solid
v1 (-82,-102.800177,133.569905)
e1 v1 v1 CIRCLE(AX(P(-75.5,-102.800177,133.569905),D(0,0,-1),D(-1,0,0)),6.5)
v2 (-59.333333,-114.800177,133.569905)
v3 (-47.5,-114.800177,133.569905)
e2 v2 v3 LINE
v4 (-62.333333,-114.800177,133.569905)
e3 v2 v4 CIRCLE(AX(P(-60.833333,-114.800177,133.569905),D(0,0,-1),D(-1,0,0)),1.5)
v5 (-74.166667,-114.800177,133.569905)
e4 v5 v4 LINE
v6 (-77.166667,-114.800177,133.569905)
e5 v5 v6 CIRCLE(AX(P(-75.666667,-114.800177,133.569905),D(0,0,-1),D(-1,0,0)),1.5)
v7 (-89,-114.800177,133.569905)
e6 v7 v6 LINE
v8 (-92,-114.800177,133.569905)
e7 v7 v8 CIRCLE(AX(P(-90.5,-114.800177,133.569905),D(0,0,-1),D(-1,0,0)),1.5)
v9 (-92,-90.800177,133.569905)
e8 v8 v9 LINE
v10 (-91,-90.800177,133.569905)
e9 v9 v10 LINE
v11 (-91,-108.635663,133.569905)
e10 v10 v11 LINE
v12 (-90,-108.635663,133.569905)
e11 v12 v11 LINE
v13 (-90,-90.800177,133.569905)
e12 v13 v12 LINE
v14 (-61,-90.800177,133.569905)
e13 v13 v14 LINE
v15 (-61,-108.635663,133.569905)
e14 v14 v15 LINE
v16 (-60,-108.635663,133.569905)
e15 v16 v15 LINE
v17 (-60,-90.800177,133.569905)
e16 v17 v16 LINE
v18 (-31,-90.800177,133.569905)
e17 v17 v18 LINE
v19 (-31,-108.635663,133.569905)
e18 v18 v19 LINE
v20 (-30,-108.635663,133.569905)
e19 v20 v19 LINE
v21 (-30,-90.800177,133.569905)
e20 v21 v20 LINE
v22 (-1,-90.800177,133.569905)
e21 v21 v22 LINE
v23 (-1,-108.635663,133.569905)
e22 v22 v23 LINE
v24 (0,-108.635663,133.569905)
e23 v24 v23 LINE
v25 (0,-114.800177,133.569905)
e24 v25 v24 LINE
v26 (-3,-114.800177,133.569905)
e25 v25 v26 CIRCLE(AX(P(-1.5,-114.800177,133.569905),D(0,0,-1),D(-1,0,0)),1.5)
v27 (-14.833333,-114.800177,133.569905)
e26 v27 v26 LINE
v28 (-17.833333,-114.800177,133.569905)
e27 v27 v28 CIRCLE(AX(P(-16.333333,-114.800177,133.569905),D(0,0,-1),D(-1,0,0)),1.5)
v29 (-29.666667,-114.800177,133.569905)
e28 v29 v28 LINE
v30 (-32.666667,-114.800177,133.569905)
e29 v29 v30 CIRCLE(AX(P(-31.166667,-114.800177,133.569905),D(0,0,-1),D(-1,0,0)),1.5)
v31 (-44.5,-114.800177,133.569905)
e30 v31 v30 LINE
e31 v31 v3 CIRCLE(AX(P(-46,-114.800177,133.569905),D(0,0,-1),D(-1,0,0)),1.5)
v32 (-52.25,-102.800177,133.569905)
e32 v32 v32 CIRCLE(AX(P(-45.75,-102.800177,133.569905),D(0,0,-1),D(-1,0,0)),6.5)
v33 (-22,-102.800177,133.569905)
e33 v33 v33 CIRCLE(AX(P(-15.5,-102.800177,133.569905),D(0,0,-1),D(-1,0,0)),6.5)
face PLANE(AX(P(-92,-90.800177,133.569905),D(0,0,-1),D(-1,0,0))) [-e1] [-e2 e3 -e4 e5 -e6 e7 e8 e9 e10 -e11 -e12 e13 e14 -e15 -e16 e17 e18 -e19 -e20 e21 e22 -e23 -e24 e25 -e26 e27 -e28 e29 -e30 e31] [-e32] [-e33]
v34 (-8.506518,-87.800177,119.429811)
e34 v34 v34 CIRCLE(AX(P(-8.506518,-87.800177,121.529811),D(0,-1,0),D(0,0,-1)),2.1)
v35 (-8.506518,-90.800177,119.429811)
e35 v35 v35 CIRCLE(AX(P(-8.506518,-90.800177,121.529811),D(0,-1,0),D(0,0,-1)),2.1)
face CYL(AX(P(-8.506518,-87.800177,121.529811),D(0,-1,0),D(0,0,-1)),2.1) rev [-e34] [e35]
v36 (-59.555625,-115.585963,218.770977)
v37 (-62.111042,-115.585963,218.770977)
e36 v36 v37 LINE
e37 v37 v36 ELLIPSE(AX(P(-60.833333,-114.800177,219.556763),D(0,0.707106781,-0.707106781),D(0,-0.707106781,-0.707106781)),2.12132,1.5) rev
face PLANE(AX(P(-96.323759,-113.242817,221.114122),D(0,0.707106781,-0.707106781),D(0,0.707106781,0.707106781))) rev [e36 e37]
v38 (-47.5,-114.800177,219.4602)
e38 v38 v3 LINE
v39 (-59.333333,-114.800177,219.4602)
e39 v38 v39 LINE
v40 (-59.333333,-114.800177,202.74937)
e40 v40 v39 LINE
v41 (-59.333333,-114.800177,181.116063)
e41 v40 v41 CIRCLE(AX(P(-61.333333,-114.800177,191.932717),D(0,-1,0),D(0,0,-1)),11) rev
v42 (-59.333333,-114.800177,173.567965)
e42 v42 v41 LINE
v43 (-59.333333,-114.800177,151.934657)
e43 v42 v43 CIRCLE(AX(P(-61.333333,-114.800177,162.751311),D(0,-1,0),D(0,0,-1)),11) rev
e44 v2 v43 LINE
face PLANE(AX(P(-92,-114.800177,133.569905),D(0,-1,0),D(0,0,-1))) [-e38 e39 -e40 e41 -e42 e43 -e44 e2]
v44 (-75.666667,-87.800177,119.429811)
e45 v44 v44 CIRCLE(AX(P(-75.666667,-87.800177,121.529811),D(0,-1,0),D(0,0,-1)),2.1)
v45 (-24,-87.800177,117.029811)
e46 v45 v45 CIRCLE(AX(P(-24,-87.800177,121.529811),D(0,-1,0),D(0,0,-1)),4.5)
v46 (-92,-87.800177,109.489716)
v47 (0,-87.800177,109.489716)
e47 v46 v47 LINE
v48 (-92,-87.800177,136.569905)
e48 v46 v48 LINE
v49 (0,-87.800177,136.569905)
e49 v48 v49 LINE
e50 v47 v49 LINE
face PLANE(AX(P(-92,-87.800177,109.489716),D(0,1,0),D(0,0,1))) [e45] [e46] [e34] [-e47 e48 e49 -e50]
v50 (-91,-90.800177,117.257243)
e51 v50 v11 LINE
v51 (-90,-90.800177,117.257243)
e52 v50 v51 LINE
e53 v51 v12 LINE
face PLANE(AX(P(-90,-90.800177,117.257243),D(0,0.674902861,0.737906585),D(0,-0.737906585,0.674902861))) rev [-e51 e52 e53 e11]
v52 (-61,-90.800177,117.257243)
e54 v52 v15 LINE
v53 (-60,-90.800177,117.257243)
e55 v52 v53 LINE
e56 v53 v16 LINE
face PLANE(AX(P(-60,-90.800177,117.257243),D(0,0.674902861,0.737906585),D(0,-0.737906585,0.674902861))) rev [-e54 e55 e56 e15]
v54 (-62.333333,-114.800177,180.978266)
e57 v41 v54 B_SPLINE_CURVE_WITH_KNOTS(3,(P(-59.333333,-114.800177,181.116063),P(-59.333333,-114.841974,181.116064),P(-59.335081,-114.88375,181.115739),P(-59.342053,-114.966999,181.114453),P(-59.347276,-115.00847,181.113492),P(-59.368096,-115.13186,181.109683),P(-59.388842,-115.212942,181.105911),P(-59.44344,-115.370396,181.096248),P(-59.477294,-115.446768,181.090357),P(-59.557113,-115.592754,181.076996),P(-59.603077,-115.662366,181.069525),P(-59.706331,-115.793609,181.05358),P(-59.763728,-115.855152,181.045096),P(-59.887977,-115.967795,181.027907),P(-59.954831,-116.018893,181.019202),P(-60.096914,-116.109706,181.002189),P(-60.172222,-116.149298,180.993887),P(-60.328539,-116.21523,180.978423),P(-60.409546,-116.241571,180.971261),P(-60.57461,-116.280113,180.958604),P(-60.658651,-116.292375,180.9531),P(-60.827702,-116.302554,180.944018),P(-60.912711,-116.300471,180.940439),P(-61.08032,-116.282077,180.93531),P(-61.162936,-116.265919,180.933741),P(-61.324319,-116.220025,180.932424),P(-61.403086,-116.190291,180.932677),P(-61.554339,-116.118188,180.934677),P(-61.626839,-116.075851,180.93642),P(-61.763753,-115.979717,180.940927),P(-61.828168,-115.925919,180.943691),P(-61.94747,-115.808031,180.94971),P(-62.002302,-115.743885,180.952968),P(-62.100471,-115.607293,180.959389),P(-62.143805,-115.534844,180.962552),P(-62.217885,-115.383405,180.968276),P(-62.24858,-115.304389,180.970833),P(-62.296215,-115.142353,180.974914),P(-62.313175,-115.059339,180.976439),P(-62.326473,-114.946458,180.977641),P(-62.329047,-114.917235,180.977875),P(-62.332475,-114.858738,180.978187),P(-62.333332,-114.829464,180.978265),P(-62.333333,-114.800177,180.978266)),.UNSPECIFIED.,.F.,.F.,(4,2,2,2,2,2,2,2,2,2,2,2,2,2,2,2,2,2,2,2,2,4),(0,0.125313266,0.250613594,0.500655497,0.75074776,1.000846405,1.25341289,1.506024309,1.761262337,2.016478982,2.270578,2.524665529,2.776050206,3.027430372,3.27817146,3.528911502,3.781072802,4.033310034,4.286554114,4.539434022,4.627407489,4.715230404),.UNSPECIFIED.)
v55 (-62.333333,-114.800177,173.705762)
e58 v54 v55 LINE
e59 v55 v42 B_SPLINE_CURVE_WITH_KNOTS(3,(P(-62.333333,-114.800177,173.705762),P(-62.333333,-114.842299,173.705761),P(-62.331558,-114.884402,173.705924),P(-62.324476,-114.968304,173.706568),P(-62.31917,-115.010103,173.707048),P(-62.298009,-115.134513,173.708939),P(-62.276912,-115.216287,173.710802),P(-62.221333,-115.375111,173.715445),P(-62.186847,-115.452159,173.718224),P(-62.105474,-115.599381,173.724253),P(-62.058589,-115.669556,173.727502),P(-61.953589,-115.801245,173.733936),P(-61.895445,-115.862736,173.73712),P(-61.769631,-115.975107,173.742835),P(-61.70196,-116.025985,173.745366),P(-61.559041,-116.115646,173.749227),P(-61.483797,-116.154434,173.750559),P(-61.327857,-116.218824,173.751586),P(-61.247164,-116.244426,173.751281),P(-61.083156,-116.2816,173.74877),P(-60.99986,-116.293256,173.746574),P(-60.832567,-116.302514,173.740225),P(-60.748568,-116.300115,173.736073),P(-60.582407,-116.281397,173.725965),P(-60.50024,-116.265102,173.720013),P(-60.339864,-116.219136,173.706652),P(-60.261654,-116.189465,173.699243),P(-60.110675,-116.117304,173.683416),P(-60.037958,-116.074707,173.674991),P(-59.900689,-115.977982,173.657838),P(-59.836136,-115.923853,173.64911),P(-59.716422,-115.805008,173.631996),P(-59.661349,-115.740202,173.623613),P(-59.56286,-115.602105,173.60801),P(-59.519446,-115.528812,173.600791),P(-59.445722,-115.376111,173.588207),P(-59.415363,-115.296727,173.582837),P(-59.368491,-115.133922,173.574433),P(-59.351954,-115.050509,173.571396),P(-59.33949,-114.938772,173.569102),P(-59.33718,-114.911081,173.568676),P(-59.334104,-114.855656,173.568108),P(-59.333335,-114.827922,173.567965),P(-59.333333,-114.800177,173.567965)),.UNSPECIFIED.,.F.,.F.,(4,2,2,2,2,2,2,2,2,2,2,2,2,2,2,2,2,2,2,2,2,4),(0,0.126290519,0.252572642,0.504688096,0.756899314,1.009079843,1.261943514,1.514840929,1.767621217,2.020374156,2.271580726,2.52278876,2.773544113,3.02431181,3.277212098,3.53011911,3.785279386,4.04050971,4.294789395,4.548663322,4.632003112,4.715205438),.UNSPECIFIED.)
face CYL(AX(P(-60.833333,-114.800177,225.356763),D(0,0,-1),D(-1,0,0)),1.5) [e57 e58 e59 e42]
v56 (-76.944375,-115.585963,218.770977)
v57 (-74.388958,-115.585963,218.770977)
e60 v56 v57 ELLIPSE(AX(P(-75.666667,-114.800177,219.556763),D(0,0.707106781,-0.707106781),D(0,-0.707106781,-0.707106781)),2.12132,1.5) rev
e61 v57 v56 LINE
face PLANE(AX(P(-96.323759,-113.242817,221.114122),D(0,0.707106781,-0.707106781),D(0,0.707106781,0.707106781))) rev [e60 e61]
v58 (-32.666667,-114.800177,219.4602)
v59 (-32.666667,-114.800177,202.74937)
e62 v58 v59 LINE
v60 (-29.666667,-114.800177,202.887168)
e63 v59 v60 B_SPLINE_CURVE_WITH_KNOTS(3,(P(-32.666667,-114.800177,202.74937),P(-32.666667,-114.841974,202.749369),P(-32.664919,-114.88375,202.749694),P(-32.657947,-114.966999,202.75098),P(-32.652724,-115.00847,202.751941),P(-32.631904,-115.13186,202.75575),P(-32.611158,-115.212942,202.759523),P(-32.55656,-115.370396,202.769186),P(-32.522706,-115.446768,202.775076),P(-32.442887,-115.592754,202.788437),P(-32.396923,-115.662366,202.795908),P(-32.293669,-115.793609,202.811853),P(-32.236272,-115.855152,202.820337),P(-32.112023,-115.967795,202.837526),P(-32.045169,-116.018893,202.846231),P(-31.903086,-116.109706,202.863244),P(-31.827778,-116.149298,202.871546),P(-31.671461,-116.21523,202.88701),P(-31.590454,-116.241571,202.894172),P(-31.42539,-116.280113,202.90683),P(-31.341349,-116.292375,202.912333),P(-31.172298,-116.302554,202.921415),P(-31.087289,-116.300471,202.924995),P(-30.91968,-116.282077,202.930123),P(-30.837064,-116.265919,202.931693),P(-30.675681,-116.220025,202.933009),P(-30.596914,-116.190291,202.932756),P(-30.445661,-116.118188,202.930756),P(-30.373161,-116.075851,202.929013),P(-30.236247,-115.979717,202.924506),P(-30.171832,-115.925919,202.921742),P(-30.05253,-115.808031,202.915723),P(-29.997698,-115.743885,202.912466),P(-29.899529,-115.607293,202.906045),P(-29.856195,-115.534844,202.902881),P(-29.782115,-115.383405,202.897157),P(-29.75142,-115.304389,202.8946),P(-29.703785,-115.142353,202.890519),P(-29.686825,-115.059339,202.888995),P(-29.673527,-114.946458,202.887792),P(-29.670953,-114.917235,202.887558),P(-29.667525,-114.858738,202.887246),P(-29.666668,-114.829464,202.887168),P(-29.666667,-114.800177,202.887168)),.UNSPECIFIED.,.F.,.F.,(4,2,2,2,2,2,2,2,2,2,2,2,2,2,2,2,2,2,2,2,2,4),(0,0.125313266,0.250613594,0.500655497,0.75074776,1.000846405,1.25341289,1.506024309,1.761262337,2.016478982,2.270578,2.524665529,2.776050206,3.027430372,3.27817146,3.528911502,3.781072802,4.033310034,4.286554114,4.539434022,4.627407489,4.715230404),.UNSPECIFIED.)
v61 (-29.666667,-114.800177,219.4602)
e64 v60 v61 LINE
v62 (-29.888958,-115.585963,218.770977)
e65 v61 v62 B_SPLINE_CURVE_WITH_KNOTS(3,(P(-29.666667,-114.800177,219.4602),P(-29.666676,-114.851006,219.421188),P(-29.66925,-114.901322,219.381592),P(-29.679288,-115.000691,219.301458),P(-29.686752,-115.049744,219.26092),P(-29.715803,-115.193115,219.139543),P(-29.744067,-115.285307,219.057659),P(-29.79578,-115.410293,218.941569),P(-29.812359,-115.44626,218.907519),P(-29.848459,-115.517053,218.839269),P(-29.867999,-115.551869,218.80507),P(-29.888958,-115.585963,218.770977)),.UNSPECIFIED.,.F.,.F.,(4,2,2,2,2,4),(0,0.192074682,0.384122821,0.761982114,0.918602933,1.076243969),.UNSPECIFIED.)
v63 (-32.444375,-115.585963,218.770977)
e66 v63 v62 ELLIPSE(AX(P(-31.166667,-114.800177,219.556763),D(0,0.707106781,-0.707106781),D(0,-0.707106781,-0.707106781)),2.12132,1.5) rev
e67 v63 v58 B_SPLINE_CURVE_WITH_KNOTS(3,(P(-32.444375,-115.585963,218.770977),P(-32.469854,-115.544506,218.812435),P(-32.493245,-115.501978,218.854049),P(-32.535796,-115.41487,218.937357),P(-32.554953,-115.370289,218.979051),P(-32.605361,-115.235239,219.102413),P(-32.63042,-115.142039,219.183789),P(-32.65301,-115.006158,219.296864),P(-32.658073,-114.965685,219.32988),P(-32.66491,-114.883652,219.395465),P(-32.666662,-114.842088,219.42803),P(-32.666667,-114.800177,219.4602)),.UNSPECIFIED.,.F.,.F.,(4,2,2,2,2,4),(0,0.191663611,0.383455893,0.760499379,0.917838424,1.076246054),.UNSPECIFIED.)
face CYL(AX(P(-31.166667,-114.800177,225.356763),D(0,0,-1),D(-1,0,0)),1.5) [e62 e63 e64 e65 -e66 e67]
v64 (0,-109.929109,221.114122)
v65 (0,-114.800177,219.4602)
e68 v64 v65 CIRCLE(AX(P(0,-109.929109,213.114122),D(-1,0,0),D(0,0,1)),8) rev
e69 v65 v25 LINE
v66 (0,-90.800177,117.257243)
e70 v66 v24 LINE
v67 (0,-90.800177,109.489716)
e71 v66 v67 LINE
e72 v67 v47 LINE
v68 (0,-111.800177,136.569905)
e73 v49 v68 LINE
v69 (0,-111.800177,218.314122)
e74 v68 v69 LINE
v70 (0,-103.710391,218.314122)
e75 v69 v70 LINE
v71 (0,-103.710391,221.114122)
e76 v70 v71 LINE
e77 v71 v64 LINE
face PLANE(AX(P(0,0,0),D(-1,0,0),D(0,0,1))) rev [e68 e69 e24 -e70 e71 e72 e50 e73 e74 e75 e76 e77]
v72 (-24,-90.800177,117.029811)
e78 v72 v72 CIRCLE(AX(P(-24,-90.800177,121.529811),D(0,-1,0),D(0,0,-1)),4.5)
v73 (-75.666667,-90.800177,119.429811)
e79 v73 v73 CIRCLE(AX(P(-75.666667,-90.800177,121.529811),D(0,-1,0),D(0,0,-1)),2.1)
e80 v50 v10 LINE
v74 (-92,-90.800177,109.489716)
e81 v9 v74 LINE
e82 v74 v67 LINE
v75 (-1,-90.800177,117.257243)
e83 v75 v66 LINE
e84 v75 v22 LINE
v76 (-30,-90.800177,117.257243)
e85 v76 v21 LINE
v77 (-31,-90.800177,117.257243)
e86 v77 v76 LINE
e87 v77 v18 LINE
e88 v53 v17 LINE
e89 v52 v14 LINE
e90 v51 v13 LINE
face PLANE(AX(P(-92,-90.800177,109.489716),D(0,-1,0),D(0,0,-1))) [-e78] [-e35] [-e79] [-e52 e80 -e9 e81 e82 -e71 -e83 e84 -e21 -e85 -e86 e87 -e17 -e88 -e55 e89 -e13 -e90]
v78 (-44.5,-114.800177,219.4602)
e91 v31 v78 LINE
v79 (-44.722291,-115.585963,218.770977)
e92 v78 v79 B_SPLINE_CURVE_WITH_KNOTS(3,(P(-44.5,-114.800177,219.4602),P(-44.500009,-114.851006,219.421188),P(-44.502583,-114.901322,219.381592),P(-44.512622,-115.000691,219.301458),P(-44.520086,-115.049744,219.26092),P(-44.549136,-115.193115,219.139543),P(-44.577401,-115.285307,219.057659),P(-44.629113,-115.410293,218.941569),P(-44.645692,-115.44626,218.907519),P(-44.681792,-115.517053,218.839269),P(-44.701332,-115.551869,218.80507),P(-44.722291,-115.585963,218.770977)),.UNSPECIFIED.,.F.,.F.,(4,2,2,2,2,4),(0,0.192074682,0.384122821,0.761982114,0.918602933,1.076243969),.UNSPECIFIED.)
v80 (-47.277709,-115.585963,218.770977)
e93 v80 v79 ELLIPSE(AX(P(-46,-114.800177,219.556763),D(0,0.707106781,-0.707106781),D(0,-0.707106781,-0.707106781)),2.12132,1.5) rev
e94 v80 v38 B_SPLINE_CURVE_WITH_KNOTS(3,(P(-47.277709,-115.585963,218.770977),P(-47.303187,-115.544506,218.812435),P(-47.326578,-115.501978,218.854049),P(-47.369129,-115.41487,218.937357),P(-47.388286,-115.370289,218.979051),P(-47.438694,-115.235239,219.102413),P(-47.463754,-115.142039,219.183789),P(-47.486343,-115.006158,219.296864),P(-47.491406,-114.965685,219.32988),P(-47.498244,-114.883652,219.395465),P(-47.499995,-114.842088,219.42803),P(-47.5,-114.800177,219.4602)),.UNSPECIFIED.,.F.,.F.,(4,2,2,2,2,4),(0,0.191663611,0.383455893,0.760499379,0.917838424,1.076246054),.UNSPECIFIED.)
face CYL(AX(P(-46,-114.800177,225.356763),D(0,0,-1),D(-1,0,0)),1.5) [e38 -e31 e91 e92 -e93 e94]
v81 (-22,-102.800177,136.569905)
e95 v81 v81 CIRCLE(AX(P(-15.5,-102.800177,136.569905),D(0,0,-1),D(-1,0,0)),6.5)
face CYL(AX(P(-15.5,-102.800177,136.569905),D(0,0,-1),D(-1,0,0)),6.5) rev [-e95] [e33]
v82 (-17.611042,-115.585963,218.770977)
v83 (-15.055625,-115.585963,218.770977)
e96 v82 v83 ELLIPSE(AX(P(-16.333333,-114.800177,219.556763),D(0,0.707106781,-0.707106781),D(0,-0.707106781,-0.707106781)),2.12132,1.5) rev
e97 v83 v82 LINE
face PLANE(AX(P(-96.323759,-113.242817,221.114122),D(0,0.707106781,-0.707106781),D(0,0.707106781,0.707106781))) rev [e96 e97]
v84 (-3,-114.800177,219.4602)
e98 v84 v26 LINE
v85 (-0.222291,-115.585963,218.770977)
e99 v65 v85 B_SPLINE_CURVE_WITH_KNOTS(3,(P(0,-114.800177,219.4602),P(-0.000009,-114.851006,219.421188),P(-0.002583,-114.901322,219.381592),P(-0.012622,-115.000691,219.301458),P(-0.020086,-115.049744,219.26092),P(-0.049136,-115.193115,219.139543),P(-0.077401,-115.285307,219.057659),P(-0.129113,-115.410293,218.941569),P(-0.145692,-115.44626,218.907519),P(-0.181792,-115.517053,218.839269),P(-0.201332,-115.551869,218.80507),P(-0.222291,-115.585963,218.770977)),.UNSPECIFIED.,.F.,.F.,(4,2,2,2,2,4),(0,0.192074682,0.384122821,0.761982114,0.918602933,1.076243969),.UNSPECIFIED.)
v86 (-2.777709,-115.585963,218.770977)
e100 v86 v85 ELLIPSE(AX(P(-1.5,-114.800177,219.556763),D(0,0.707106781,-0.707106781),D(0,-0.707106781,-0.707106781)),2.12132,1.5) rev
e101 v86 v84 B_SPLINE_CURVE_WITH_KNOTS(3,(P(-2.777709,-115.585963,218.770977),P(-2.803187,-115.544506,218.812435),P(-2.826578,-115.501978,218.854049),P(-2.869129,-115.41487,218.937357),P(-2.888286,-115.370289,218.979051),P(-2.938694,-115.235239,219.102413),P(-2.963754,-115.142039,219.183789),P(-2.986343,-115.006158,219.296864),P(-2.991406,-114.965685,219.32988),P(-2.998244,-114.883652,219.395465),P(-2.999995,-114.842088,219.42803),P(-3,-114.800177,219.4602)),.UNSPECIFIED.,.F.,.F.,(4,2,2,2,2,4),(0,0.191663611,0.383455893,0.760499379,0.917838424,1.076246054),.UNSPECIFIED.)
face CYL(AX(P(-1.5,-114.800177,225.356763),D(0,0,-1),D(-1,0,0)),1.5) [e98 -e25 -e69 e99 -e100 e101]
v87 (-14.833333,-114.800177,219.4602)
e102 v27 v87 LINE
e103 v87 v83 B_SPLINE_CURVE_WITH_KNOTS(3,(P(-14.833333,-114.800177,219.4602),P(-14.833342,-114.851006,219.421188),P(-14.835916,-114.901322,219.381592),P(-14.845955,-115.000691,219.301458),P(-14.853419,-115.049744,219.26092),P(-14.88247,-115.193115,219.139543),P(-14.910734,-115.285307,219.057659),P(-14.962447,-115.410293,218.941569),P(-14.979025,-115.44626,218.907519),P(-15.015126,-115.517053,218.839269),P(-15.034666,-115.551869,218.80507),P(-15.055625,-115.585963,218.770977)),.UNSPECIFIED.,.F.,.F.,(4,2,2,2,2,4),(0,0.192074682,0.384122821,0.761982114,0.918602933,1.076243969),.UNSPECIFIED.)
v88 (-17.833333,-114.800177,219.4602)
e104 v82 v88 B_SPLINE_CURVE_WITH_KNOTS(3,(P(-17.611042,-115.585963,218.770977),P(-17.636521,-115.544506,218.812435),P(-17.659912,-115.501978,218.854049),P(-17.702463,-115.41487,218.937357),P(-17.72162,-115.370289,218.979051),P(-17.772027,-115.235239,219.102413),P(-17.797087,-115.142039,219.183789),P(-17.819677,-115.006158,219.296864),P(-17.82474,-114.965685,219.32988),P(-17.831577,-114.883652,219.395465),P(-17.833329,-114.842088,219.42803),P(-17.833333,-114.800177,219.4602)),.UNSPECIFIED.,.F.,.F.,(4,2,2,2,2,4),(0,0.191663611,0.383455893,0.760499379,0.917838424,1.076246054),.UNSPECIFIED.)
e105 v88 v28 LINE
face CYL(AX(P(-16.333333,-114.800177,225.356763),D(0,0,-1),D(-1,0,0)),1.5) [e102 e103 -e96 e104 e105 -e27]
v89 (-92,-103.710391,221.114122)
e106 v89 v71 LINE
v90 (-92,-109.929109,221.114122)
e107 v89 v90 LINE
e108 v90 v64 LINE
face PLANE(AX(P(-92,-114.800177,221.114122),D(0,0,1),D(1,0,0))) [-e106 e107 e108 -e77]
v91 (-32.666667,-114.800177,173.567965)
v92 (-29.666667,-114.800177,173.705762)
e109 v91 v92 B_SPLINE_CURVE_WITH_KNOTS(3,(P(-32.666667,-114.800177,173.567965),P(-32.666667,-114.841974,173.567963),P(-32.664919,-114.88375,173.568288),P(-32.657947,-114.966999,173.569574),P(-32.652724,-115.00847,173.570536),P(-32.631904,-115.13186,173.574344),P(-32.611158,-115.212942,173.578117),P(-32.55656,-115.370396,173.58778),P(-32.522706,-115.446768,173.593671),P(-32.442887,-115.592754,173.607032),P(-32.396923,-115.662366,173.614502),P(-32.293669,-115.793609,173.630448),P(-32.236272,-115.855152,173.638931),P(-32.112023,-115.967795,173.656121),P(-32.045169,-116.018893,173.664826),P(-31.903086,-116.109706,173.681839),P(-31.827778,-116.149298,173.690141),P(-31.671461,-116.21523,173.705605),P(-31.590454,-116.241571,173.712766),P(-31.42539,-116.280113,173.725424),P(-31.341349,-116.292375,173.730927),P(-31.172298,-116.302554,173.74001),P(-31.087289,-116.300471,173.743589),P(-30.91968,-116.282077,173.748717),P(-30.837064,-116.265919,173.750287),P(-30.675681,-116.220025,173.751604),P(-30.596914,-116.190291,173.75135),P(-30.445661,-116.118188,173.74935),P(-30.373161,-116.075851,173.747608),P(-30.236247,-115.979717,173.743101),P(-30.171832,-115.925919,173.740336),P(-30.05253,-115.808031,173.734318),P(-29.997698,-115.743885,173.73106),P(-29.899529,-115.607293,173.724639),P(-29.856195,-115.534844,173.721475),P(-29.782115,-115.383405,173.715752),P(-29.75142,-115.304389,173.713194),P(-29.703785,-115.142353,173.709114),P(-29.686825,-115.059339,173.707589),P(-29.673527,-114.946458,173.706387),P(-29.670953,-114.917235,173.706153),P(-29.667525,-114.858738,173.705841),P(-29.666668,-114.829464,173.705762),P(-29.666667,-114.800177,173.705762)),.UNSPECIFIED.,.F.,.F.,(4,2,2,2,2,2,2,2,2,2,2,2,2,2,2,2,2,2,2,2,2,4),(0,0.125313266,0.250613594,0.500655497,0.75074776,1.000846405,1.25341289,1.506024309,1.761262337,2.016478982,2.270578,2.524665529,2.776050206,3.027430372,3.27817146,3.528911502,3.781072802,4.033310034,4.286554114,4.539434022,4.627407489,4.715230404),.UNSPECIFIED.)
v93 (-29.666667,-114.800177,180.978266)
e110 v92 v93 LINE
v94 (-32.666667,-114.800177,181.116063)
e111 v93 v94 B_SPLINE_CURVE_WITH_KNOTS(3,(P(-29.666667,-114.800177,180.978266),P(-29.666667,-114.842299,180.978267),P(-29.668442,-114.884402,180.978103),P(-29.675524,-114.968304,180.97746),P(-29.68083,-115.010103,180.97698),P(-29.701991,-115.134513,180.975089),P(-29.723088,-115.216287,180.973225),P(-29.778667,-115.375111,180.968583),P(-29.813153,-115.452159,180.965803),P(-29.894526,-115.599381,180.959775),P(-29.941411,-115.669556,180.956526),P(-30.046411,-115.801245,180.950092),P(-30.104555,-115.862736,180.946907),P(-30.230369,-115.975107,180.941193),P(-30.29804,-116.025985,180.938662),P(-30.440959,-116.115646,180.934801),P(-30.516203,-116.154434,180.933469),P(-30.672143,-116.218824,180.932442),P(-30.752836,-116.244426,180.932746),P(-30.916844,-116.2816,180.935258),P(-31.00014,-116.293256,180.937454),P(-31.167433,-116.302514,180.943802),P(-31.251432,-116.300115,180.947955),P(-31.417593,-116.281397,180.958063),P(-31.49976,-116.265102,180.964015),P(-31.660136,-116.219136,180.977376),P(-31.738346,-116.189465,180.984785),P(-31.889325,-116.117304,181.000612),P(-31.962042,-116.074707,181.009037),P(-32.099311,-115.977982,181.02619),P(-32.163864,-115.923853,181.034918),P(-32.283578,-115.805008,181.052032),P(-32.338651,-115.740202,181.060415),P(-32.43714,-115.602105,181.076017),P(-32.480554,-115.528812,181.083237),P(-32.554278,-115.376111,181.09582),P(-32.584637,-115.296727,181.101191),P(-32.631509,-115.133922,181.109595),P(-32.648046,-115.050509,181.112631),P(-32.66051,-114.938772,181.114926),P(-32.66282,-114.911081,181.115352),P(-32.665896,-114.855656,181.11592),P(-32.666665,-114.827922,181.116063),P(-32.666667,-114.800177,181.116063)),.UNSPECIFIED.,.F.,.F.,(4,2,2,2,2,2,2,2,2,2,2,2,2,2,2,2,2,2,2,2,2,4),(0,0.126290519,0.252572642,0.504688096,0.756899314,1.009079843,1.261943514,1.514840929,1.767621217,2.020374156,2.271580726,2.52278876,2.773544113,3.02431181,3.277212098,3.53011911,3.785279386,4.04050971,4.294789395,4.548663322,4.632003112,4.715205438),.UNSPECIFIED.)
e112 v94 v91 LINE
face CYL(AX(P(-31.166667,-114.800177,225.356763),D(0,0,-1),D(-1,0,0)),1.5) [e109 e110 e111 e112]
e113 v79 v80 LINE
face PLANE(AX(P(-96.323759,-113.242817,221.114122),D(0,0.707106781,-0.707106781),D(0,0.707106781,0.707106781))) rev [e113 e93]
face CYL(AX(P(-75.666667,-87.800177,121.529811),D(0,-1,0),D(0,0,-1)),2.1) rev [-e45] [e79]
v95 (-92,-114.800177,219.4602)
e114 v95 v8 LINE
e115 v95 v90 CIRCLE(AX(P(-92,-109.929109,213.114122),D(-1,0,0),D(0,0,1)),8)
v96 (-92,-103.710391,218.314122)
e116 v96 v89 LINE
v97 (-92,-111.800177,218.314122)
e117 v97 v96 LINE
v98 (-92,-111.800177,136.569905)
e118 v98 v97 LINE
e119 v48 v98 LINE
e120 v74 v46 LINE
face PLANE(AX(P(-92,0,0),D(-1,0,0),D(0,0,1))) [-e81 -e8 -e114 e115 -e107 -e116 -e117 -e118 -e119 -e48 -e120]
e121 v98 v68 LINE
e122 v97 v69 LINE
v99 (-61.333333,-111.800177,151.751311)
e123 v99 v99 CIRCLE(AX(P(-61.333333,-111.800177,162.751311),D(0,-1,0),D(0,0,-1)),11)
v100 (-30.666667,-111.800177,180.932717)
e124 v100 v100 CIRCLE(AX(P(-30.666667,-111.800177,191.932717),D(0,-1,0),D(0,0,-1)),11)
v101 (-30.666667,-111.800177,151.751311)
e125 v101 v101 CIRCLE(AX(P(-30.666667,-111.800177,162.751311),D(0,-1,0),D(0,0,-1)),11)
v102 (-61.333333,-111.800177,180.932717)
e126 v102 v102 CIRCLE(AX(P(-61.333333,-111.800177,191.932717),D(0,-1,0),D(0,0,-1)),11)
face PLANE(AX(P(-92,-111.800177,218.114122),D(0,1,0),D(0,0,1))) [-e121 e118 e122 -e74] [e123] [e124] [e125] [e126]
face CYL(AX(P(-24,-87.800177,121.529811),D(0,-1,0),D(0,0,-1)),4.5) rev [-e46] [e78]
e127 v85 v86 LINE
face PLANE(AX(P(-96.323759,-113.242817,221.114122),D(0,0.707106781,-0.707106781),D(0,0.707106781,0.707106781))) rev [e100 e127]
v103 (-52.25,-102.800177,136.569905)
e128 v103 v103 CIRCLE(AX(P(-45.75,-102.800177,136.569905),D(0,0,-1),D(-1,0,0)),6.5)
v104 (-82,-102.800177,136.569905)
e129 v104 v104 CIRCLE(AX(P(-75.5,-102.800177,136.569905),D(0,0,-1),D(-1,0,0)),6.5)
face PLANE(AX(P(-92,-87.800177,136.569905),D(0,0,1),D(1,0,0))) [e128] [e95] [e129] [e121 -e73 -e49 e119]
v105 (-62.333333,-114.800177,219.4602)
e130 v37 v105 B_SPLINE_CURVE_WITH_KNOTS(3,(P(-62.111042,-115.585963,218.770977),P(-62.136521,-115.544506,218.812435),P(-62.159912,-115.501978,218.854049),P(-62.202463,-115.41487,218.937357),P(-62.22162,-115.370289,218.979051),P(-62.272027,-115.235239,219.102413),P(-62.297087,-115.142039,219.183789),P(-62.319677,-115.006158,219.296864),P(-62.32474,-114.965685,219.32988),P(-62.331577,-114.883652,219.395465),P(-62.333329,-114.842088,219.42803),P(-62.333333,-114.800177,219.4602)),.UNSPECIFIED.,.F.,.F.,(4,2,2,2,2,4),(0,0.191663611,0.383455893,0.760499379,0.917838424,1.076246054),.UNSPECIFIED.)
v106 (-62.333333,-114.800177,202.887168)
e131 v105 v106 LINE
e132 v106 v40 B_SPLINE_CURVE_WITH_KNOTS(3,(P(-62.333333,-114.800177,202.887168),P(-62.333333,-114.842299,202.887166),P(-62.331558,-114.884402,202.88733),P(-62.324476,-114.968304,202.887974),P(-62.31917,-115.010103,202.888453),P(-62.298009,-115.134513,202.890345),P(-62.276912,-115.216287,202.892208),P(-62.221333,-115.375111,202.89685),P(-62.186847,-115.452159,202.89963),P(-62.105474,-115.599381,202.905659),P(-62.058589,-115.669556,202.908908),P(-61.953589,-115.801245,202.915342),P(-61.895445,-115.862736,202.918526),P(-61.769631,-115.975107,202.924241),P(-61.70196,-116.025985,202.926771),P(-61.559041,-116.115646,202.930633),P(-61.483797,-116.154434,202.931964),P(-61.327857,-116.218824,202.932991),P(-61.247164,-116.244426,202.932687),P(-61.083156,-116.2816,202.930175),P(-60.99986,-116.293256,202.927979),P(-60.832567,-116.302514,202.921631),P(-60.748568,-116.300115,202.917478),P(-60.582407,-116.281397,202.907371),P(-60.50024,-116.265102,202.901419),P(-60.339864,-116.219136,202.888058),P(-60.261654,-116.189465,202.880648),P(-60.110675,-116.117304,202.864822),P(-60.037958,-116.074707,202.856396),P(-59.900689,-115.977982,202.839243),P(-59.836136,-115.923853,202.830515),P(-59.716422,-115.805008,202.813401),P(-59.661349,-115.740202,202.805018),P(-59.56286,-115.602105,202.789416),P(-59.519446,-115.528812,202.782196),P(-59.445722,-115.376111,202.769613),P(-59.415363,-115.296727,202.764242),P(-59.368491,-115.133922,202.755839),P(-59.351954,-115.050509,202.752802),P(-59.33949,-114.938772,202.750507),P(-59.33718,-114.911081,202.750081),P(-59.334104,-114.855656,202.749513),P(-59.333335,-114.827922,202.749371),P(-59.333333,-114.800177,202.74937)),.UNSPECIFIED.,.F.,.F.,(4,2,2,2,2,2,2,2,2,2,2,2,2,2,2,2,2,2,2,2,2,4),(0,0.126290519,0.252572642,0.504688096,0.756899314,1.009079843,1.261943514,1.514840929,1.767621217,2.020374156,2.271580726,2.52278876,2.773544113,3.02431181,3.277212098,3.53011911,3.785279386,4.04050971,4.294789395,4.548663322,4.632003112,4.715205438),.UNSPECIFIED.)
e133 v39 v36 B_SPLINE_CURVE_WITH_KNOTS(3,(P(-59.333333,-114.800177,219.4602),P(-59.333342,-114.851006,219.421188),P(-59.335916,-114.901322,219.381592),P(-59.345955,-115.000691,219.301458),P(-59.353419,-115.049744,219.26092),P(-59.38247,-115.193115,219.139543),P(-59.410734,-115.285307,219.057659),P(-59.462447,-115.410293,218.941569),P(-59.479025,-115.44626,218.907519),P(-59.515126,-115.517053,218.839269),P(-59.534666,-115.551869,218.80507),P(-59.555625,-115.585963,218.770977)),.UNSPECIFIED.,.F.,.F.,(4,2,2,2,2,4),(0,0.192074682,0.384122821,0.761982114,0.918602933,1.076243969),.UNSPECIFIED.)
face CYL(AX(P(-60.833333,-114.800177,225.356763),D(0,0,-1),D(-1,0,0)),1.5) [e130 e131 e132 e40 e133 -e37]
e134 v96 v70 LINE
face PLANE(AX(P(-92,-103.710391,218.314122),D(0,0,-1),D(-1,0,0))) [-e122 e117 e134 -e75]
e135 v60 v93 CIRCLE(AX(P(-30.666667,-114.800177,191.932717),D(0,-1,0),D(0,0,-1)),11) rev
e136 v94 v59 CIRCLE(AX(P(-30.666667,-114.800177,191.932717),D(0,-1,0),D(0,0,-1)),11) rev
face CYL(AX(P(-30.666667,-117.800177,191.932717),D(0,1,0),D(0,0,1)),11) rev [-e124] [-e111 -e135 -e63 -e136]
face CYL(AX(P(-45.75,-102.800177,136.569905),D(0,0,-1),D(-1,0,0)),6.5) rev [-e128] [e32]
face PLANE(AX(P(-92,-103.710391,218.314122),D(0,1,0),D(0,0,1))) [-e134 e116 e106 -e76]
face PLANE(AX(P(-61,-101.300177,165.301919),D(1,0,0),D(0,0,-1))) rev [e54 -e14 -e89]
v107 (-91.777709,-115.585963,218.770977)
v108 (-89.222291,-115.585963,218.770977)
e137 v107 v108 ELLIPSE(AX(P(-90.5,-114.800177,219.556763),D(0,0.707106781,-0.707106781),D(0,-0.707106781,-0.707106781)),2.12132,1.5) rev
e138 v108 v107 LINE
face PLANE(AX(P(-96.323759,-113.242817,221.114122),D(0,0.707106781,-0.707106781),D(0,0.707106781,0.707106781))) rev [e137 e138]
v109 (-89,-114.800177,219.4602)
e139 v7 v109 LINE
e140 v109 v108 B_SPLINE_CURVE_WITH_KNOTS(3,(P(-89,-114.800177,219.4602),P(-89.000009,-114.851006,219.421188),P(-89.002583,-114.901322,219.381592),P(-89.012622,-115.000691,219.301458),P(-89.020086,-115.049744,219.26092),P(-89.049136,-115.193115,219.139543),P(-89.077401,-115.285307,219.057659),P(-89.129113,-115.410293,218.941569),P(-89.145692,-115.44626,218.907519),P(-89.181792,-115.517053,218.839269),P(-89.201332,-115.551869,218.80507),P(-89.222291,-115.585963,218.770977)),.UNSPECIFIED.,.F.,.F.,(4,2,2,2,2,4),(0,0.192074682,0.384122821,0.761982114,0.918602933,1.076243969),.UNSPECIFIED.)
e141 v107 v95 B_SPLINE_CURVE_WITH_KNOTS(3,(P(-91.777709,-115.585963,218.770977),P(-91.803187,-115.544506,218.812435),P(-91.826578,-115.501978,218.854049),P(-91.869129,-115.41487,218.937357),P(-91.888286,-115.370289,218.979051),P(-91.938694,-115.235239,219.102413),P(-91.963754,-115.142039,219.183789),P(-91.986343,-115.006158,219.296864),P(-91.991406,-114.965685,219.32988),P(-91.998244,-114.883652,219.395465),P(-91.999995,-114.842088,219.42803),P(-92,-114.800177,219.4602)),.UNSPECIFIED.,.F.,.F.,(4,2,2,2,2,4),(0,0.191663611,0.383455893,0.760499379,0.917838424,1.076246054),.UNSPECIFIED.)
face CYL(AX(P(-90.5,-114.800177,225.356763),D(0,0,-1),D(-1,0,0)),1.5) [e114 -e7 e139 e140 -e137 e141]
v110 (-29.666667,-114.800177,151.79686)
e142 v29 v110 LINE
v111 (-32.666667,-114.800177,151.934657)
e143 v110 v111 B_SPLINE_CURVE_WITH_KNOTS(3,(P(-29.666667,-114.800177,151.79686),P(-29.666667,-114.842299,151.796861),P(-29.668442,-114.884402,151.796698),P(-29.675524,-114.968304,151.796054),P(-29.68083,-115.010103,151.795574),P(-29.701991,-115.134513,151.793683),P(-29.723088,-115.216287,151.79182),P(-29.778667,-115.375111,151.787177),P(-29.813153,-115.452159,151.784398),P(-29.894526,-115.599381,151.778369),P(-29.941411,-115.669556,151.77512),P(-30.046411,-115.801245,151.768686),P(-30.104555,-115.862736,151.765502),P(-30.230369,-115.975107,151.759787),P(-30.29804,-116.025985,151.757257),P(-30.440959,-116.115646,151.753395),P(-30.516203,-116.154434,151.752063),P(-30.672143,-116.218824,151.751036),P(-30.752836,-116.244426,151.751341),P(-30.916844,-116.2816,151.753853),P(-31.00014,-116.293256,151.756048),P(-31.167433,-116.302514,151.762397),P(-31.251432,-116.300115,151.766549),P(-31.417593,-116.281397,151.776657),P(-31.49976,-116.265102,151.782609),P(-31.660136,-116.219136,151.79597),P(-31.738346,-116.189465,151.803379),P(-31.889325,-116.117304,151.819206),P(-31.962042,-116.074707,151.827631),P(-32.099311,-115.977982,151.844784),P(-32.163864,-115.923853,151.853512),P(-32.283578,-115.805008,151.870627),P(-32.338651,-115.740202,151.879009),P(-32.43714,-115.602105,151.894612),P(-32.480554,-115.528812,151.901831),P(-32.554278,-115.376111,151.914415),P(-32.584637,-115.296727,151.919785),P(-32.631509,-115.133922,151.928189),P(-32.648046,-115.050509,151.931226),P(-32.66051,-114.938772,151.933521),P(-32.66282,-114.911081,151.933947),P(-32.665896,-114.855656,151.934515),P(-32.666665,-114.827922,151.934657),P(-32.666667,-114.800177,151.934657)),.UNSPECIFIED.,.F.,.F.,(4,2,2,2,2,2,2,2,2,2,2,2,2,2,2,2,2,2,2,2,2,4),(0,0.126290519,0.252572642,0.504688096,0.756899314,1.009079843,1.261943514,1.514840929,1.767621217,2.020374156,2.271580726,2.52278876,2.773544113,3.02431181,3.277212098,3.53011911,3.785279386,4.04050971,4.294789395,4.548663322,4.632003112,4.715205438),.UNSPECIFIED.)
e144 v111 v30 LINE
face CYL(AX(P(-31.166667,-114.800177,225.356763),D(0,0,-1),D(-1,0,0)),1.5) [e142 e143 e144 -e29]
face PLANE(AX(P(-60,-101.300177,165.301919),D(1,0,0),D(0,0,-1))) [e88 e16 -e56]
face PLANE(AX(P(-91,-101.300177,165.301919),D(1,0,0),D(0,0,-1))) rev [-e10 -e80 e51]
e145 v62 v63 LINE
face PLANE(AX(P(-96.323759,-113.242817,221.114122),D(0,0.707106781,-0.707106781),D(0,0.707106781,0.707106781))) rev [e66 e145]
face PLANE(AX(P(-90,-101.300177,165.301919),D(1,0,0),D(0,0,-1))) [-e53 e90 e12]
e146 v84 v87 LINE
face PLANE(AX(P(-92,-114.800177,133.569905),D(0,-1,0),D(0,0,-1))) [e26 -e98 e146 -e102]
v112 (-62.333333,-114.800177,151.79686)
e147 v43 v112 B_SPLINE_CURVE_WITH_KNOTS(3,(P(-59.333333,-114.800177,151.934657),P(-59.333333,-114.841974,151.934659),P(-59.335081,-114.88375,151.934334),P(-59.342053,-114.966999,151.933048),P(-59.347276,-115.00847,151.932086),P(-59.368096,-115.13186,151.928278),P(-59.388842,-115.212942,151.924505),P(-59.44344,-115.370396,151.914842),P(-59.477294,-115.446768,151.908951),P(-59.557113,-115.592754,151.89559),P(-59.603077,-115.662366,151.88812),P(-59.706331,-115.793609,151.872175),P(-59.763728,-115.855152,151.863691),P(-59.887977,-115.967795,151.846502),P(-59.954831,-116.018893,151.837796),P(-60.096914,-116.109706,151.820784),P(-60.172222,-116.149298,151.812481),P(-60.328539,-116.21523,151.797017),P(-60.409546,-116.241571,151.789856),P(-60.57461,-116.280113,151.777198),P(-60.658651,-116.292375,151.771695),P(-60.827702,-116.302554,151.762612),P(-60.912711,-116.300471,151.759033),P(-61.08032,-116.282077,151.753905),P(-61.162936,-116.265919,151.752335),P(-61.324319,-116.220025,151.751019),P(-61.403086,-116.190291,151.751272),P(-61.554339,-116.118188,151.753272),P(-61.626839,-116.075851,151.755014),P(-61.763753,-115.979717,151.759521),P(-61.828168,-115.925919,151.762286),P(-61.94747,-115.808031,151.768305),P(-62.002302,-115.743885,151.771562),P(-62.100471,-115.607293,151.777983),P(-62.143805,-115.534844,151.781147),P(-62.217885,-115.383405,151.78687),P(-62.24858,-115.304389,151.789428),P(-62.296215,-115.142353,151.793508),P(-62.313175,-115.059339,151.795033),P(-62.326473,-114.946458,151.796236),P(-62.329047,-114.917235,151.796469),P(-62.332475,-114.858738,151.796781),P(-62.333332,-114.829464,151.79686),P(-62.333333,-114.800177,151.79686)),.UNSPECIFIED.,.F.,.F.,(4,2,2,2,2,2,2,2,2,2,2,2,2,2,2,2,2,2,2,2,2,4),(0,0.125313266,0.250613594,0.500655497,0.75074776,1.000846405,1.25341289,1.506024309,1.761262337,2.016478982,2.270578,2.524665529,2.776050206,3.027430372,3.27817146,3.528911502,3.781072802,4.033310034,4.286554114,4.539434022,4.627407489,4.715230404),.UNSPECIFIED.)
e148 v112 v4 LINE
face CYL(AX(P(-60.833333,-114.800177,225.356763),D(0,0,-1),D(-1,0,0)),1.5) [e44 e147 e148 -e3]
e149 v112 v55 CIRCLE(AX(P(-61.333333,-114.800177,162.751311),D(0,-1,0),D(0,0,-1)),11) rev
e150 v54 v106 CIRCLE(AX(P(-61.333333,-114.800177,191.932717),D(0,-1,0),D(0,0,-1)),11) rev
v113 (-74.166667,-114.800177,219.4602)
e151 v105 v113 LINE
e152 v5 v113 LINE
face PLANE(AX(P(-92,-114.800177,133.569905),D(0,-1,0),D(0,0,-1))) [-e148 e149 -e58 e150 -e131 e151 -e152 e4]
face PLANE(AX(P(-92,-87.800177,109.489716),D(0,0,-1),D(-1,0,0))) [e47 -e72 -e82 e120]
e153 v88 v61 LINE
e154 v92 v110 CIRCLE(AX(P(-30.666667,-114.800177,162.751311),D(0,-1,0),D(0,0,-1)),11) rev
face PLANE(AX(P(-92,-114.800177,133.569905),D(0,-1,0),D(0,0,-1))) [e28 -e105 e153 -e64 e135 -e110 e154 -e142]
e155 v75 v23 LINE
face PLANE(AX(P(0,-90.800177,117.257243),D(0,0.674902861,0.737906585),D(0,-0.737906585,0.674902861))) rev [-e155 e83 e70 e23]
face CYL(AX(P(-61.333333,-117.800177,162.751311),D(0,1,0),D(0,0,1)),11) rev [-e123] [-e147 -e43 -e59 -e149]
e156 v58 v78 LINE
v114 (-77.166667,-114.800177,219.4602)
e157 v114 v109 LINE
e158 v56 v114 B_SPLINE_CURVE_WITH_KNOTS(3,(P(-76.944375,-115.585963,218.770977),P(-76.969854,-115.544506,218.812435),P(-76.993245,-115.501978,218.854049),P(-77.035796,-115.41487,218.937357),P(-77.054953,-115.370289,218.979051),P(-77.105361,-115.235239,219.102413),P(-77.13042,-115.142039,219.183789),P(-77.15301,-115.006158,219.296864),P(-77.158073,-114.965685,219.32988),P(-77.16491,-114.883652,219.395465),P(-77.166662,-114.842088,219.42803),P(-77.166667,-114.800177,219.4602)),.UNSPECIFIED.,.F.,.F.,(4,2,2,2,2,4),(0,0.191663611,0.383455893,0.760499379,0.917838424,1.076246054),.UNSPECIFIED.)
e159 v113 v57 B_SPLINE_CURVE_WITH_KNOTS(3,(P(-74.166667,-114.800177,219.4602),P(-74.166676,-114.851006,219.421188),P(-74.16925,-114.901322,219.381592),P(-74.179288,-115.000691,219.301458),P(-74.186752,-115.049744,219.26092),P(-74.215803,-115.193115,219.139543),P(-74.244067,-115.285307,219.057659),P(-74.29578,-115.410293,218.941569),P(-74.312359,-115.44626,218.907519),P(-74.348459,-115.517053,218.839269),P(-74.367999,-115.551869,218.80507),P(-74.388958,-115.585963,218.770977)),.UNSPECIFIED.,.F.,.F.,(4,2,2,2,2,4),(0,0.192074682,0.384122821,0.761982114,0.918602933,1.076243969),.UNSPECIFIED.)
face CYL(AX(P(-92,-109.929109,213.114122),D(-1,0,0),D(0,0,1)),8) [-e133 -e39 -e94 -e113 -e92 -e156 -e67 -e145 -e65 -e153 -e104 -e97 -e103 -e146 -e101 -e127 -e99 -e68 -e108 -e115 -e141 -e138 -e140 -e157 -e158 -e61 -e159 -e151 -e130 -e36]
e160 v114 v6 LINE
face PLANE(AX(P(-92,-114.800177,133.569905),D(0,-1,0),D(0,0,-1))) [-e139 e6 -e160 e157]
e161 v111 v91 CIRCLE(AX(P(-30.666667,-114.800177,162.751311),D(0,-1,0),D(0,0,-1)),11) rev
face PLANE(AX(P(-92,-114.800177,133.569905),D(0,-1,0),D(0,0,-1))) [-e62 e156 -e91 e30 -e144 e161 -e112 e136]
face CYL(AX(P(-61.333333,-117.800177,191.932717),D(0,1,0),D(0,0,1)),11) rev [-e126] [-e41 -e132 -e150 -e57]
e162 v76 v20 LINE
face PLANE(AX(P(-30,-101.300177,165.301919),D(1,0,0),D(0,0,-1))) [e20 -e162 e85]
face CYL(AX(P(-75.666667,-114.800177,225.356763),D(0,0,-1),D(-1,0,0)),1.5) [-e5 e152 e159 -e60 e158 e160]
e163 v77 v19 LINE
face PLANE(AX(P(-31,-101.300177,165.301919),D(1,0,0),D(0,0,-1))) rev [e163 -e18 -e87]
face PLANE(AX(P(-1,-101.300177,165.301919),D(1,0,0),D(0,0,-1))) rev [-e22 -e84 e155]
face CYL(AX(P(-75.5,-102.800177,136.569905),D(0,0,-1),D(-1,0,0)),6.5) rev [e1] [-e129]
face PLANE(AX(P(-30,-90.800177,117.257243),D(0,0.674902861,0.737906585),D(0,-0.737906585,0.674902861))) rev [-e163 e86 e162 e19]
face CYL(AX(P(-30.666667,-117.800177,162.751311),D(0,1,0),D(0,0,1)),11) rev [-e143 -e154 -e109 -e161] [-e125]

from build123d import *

# Parameters (mm, degrees)
BOSS_EXTRU_1_DEPTH           = 92
NERVURE2_REACH               = 267.583
ESQUISSE3_WALL_W             = 557.337159988
ESQUISSE3_WALL_H             = 1
R_P_TITION_LIN_AIRE1_COUNT   = 4
R_P_TITION_LIN_AIRE1_PITCH   = 30
ESQUISSE4_R                  = 6.5
ENL_V_MAT_EXTRU_1_DEPTH      = 3
ESQUISSE6_R                  = 1.5
BOSS_EXTRU_2_DEPTH           = 87.544216856
R_P_TITION_LIN_AIRE2_COUNT   = 7
R_P_TITION_LIN_AIRE2_PITCH   = 14.833333333
ENL_V_MAT_EXTRU_2_DEPTH      = 3
ENL_V_MAT_EXTRU_2_DEPTH_BACK = 3
ESQUISSE5_R                  = 11
ENL_V_START                  = -92
ENL_V_MAT_EXTRU_3_DEPTH      = 92
CONG_1_R                     = 8
ESQUISSE9_R                  = 4.5
ENL_V_MAT_EXTRU_5_DEPTH      = 3
ESQUISSE8_R                  = 2.1
ENL_V_MAT_EXTRU_4_DEPTH      = 3


with BuildPart() as part:
    # Esquisse1 → Boss.-Extru.1 (new body)
    with BuildSketch(Plane(origin=(0, 0, 0), x_dir=(0, 0, -1), z_dir=(1, 0, 0))):
        Polygon((-109.489716306, -87.800176517), (-136.569905432, -87.800176517), (-136.569905432, -111.800176517), (-218.114122288, -111.800176517), (-218.314122288, -111.800176517), (-218.314122288, -103.710391053), (-221.114122288, -103.710391053), (-221.114122288, -114.800176517), (-133.569905432, -114.800176517), (-133.569905432, -90.800176517), (-109.489716306, -90.800176517), align=None)
    extrude(amount=-BOSS_EXTRU_1_DEPTH)

    # Esquisse3 wall → Nervure2 (add, up to next)
    with BuildSketch(Plane(origin=(0, -99.717919792, 125.413574296), x_dir=(0, -0.737906584765, 0.674902861278), z_dir=(0, -0.674902861278, -0.737906584765)), mode=Mode.PRIVATE) as nervure2_sk1:
        with Locations((0, 0.5)):
            Rectangle(ESQUISSE3_WALL_W, ESQUISSE3_WALL_H)
    nervure2_tool1 = extrude(nervure2_sk1.sketch, amount=-NERVURE2_REACH, mode=Mode.PRIVATE) - part.part
    nervure2 = nervure2_tool1.solids().sort_by_distance((0, -99.717919792, 125.413574296))[0]
    add(nervure2)

    # Répétition linéaire1: Nervure2 ×4
    with Locations(*[(-i * R_P_TITION_LIN_AIRE1_PITCH, 0, 0) for i in range(1, R_P_TITION_LIN_AIRE1_COUNT)]):
        add(nervure2)

    # Esquisse4 → Enlèv. mat.-Extru.1 (cut)
    with BuildSketch(Plane(origin=(0, 0, 133.569905432), x_dir=(-1, 0, 0), z_dir=(0, 0, -1))):
        with Locations((15.5, -102.800176517)):
            Circle(ESQUISSE4_R)
        with Locations((45.75, -102.800176517)):
            Circle(ESQUISSE4_R)
        with Locations((75.5, -102.800176517)):
            Circle(ESQUISSE4_R)
    extrude(amount=-ENL_V_MAT_EXTRU_1_DEPTH, mode=Mode.SUBTRACT)

    # Esquisse6 → Boss.-Extru.2 (add)
    with BuildSketch(Plane(origin=(0, 0, 133.569905432), x_dir=(-1, 0, 0), z_dir=(0, 0, -1))):
        with Locations((1.5, -114.800176517)):
            Circle(ESQUISSE6_R)
    boss_extru_2 = extrude(amount=-BOSS_EXTRU_2_DEPTH)

    # Répétition linéaire2: Boss.-Extru.2 ×7
    with Locations(*[(-i * R_P_TITION_LIN_AIRE2_PITCH, 0, 0) for i in range(1, R_P_TITION_LIN_AIRE2_COUNT)]):
        add(boss_extru_2)

    # Esquisse5 → Enlèv. mat.-Extru.2 (cut, two sides: drawn at the far end of the back side and taken through both)
    with BuildSketch(Plane(origin=(0, -114.800176517, 0), x_dir=(-1, 0, 0), z_dir=(0, -1, 0)).offset(-ENL_V_MAT_EXTRU_2_DEPTH_BACK)):
        with Locations(Location((30.666666667, -162.751311051, 0), (0, 0, 264.78409143))):
            Circle(ESQUISSE5_R)
        with Locations(Location((61.333333333, -162.751311051, 0), (0, 0, 275.21590857))):
            Circle(ESQUISSE5_R)
        with Locations(Location((61.333333333, -191.93271667, 0), (0, 0, 275.21590857))):
            Circle(ESQUISSE5_R)
        with Locations(Location((30.666666667, -191.93271667, 0), (0, 0, 264.78409143))):
            Circle(ESQUISSE5_R)
    extrude(amount=ENL_V_MAT_EXTRU_2_DEPTH + ENL_V_MAT_EXTRU_2_DEPTH_BACK, mode=Mode.SUBTRACT)

    # Esquisse7 → Enlèv. mat.-Extru.3 (cut)
    with BuildSketch(Plane(origin=(0, 0, 0), x_dir=(0, 0, -1), z_dir=(1, 0, 0)).offset(ENL_V_START)):
        Polygon((-221.114122288, -113.242817204), (-218.056762976, -116.300176517), (-221.114122288, -116.300176517), align=None)
    extrude(amount=ENL_V_MAT_EXTRU_3_DEPTH, mode=Mode.SUBTRACT)

    # Congé1
    # the kernel refuses this fillet: 8 mm, written as the material it takes off along each edge
    with BuildSketch(Plane(origin=(-100.284271247, -113.242817204, 221.114122288), x_dir=(0, -0.7071067811865497, -0.7071067811865454), z_dir=(1, 0, 0))) as cong_1_piece_1:
        with BuildLine():
            CenterArc((CONG_1_R * 0.414213562373, CONG_1_R), CONG_1_R, 225, 45)
            Line((-CONG_1_R * 0.292893218813, CONG_1_R * 0.292893218813), (0, 0))
            Line((0, 0), (CONG_1_R * 0.414213562373, 0))
        make_face()
    extrude(amount=108.568542495, mode=Mode.SUBTRACT)

    # Esquisse9 → Enlèv. mat.-Extru.5 (cut)
    with BuildSketch(Plane.XZ.offset(90.800176517)):
        with Locations(Location((-24, 121.529810869, 0), (0, 0, 270))):
            Circle(ESQUISSE9_R)
    extrude(amount=-ENL_V_MAT_EXTRU_5_DEPTH, mode=Mode.SUBTRACT)

    # Esquisse8 → Enlèv. mat.-Extru.4 (cut)
    with BuildSketch(Plane.XZ.offset(90.800176517)):
        with Locations(Location((-8.506517848, 121.529810869, 0), (0, 0, 270))):
            Circle(ESQUISSE8_R)
        with Locations(Location((-75.666666667, 121.529810869, 0), (0, 0, 270))):
            Circle(ESQUISSE8_R)
    extrude(amount=-ENL_V_MAT_EXTRU_4_DEPTH, mode=Mode.SUBTRACT)


solid = part.part
